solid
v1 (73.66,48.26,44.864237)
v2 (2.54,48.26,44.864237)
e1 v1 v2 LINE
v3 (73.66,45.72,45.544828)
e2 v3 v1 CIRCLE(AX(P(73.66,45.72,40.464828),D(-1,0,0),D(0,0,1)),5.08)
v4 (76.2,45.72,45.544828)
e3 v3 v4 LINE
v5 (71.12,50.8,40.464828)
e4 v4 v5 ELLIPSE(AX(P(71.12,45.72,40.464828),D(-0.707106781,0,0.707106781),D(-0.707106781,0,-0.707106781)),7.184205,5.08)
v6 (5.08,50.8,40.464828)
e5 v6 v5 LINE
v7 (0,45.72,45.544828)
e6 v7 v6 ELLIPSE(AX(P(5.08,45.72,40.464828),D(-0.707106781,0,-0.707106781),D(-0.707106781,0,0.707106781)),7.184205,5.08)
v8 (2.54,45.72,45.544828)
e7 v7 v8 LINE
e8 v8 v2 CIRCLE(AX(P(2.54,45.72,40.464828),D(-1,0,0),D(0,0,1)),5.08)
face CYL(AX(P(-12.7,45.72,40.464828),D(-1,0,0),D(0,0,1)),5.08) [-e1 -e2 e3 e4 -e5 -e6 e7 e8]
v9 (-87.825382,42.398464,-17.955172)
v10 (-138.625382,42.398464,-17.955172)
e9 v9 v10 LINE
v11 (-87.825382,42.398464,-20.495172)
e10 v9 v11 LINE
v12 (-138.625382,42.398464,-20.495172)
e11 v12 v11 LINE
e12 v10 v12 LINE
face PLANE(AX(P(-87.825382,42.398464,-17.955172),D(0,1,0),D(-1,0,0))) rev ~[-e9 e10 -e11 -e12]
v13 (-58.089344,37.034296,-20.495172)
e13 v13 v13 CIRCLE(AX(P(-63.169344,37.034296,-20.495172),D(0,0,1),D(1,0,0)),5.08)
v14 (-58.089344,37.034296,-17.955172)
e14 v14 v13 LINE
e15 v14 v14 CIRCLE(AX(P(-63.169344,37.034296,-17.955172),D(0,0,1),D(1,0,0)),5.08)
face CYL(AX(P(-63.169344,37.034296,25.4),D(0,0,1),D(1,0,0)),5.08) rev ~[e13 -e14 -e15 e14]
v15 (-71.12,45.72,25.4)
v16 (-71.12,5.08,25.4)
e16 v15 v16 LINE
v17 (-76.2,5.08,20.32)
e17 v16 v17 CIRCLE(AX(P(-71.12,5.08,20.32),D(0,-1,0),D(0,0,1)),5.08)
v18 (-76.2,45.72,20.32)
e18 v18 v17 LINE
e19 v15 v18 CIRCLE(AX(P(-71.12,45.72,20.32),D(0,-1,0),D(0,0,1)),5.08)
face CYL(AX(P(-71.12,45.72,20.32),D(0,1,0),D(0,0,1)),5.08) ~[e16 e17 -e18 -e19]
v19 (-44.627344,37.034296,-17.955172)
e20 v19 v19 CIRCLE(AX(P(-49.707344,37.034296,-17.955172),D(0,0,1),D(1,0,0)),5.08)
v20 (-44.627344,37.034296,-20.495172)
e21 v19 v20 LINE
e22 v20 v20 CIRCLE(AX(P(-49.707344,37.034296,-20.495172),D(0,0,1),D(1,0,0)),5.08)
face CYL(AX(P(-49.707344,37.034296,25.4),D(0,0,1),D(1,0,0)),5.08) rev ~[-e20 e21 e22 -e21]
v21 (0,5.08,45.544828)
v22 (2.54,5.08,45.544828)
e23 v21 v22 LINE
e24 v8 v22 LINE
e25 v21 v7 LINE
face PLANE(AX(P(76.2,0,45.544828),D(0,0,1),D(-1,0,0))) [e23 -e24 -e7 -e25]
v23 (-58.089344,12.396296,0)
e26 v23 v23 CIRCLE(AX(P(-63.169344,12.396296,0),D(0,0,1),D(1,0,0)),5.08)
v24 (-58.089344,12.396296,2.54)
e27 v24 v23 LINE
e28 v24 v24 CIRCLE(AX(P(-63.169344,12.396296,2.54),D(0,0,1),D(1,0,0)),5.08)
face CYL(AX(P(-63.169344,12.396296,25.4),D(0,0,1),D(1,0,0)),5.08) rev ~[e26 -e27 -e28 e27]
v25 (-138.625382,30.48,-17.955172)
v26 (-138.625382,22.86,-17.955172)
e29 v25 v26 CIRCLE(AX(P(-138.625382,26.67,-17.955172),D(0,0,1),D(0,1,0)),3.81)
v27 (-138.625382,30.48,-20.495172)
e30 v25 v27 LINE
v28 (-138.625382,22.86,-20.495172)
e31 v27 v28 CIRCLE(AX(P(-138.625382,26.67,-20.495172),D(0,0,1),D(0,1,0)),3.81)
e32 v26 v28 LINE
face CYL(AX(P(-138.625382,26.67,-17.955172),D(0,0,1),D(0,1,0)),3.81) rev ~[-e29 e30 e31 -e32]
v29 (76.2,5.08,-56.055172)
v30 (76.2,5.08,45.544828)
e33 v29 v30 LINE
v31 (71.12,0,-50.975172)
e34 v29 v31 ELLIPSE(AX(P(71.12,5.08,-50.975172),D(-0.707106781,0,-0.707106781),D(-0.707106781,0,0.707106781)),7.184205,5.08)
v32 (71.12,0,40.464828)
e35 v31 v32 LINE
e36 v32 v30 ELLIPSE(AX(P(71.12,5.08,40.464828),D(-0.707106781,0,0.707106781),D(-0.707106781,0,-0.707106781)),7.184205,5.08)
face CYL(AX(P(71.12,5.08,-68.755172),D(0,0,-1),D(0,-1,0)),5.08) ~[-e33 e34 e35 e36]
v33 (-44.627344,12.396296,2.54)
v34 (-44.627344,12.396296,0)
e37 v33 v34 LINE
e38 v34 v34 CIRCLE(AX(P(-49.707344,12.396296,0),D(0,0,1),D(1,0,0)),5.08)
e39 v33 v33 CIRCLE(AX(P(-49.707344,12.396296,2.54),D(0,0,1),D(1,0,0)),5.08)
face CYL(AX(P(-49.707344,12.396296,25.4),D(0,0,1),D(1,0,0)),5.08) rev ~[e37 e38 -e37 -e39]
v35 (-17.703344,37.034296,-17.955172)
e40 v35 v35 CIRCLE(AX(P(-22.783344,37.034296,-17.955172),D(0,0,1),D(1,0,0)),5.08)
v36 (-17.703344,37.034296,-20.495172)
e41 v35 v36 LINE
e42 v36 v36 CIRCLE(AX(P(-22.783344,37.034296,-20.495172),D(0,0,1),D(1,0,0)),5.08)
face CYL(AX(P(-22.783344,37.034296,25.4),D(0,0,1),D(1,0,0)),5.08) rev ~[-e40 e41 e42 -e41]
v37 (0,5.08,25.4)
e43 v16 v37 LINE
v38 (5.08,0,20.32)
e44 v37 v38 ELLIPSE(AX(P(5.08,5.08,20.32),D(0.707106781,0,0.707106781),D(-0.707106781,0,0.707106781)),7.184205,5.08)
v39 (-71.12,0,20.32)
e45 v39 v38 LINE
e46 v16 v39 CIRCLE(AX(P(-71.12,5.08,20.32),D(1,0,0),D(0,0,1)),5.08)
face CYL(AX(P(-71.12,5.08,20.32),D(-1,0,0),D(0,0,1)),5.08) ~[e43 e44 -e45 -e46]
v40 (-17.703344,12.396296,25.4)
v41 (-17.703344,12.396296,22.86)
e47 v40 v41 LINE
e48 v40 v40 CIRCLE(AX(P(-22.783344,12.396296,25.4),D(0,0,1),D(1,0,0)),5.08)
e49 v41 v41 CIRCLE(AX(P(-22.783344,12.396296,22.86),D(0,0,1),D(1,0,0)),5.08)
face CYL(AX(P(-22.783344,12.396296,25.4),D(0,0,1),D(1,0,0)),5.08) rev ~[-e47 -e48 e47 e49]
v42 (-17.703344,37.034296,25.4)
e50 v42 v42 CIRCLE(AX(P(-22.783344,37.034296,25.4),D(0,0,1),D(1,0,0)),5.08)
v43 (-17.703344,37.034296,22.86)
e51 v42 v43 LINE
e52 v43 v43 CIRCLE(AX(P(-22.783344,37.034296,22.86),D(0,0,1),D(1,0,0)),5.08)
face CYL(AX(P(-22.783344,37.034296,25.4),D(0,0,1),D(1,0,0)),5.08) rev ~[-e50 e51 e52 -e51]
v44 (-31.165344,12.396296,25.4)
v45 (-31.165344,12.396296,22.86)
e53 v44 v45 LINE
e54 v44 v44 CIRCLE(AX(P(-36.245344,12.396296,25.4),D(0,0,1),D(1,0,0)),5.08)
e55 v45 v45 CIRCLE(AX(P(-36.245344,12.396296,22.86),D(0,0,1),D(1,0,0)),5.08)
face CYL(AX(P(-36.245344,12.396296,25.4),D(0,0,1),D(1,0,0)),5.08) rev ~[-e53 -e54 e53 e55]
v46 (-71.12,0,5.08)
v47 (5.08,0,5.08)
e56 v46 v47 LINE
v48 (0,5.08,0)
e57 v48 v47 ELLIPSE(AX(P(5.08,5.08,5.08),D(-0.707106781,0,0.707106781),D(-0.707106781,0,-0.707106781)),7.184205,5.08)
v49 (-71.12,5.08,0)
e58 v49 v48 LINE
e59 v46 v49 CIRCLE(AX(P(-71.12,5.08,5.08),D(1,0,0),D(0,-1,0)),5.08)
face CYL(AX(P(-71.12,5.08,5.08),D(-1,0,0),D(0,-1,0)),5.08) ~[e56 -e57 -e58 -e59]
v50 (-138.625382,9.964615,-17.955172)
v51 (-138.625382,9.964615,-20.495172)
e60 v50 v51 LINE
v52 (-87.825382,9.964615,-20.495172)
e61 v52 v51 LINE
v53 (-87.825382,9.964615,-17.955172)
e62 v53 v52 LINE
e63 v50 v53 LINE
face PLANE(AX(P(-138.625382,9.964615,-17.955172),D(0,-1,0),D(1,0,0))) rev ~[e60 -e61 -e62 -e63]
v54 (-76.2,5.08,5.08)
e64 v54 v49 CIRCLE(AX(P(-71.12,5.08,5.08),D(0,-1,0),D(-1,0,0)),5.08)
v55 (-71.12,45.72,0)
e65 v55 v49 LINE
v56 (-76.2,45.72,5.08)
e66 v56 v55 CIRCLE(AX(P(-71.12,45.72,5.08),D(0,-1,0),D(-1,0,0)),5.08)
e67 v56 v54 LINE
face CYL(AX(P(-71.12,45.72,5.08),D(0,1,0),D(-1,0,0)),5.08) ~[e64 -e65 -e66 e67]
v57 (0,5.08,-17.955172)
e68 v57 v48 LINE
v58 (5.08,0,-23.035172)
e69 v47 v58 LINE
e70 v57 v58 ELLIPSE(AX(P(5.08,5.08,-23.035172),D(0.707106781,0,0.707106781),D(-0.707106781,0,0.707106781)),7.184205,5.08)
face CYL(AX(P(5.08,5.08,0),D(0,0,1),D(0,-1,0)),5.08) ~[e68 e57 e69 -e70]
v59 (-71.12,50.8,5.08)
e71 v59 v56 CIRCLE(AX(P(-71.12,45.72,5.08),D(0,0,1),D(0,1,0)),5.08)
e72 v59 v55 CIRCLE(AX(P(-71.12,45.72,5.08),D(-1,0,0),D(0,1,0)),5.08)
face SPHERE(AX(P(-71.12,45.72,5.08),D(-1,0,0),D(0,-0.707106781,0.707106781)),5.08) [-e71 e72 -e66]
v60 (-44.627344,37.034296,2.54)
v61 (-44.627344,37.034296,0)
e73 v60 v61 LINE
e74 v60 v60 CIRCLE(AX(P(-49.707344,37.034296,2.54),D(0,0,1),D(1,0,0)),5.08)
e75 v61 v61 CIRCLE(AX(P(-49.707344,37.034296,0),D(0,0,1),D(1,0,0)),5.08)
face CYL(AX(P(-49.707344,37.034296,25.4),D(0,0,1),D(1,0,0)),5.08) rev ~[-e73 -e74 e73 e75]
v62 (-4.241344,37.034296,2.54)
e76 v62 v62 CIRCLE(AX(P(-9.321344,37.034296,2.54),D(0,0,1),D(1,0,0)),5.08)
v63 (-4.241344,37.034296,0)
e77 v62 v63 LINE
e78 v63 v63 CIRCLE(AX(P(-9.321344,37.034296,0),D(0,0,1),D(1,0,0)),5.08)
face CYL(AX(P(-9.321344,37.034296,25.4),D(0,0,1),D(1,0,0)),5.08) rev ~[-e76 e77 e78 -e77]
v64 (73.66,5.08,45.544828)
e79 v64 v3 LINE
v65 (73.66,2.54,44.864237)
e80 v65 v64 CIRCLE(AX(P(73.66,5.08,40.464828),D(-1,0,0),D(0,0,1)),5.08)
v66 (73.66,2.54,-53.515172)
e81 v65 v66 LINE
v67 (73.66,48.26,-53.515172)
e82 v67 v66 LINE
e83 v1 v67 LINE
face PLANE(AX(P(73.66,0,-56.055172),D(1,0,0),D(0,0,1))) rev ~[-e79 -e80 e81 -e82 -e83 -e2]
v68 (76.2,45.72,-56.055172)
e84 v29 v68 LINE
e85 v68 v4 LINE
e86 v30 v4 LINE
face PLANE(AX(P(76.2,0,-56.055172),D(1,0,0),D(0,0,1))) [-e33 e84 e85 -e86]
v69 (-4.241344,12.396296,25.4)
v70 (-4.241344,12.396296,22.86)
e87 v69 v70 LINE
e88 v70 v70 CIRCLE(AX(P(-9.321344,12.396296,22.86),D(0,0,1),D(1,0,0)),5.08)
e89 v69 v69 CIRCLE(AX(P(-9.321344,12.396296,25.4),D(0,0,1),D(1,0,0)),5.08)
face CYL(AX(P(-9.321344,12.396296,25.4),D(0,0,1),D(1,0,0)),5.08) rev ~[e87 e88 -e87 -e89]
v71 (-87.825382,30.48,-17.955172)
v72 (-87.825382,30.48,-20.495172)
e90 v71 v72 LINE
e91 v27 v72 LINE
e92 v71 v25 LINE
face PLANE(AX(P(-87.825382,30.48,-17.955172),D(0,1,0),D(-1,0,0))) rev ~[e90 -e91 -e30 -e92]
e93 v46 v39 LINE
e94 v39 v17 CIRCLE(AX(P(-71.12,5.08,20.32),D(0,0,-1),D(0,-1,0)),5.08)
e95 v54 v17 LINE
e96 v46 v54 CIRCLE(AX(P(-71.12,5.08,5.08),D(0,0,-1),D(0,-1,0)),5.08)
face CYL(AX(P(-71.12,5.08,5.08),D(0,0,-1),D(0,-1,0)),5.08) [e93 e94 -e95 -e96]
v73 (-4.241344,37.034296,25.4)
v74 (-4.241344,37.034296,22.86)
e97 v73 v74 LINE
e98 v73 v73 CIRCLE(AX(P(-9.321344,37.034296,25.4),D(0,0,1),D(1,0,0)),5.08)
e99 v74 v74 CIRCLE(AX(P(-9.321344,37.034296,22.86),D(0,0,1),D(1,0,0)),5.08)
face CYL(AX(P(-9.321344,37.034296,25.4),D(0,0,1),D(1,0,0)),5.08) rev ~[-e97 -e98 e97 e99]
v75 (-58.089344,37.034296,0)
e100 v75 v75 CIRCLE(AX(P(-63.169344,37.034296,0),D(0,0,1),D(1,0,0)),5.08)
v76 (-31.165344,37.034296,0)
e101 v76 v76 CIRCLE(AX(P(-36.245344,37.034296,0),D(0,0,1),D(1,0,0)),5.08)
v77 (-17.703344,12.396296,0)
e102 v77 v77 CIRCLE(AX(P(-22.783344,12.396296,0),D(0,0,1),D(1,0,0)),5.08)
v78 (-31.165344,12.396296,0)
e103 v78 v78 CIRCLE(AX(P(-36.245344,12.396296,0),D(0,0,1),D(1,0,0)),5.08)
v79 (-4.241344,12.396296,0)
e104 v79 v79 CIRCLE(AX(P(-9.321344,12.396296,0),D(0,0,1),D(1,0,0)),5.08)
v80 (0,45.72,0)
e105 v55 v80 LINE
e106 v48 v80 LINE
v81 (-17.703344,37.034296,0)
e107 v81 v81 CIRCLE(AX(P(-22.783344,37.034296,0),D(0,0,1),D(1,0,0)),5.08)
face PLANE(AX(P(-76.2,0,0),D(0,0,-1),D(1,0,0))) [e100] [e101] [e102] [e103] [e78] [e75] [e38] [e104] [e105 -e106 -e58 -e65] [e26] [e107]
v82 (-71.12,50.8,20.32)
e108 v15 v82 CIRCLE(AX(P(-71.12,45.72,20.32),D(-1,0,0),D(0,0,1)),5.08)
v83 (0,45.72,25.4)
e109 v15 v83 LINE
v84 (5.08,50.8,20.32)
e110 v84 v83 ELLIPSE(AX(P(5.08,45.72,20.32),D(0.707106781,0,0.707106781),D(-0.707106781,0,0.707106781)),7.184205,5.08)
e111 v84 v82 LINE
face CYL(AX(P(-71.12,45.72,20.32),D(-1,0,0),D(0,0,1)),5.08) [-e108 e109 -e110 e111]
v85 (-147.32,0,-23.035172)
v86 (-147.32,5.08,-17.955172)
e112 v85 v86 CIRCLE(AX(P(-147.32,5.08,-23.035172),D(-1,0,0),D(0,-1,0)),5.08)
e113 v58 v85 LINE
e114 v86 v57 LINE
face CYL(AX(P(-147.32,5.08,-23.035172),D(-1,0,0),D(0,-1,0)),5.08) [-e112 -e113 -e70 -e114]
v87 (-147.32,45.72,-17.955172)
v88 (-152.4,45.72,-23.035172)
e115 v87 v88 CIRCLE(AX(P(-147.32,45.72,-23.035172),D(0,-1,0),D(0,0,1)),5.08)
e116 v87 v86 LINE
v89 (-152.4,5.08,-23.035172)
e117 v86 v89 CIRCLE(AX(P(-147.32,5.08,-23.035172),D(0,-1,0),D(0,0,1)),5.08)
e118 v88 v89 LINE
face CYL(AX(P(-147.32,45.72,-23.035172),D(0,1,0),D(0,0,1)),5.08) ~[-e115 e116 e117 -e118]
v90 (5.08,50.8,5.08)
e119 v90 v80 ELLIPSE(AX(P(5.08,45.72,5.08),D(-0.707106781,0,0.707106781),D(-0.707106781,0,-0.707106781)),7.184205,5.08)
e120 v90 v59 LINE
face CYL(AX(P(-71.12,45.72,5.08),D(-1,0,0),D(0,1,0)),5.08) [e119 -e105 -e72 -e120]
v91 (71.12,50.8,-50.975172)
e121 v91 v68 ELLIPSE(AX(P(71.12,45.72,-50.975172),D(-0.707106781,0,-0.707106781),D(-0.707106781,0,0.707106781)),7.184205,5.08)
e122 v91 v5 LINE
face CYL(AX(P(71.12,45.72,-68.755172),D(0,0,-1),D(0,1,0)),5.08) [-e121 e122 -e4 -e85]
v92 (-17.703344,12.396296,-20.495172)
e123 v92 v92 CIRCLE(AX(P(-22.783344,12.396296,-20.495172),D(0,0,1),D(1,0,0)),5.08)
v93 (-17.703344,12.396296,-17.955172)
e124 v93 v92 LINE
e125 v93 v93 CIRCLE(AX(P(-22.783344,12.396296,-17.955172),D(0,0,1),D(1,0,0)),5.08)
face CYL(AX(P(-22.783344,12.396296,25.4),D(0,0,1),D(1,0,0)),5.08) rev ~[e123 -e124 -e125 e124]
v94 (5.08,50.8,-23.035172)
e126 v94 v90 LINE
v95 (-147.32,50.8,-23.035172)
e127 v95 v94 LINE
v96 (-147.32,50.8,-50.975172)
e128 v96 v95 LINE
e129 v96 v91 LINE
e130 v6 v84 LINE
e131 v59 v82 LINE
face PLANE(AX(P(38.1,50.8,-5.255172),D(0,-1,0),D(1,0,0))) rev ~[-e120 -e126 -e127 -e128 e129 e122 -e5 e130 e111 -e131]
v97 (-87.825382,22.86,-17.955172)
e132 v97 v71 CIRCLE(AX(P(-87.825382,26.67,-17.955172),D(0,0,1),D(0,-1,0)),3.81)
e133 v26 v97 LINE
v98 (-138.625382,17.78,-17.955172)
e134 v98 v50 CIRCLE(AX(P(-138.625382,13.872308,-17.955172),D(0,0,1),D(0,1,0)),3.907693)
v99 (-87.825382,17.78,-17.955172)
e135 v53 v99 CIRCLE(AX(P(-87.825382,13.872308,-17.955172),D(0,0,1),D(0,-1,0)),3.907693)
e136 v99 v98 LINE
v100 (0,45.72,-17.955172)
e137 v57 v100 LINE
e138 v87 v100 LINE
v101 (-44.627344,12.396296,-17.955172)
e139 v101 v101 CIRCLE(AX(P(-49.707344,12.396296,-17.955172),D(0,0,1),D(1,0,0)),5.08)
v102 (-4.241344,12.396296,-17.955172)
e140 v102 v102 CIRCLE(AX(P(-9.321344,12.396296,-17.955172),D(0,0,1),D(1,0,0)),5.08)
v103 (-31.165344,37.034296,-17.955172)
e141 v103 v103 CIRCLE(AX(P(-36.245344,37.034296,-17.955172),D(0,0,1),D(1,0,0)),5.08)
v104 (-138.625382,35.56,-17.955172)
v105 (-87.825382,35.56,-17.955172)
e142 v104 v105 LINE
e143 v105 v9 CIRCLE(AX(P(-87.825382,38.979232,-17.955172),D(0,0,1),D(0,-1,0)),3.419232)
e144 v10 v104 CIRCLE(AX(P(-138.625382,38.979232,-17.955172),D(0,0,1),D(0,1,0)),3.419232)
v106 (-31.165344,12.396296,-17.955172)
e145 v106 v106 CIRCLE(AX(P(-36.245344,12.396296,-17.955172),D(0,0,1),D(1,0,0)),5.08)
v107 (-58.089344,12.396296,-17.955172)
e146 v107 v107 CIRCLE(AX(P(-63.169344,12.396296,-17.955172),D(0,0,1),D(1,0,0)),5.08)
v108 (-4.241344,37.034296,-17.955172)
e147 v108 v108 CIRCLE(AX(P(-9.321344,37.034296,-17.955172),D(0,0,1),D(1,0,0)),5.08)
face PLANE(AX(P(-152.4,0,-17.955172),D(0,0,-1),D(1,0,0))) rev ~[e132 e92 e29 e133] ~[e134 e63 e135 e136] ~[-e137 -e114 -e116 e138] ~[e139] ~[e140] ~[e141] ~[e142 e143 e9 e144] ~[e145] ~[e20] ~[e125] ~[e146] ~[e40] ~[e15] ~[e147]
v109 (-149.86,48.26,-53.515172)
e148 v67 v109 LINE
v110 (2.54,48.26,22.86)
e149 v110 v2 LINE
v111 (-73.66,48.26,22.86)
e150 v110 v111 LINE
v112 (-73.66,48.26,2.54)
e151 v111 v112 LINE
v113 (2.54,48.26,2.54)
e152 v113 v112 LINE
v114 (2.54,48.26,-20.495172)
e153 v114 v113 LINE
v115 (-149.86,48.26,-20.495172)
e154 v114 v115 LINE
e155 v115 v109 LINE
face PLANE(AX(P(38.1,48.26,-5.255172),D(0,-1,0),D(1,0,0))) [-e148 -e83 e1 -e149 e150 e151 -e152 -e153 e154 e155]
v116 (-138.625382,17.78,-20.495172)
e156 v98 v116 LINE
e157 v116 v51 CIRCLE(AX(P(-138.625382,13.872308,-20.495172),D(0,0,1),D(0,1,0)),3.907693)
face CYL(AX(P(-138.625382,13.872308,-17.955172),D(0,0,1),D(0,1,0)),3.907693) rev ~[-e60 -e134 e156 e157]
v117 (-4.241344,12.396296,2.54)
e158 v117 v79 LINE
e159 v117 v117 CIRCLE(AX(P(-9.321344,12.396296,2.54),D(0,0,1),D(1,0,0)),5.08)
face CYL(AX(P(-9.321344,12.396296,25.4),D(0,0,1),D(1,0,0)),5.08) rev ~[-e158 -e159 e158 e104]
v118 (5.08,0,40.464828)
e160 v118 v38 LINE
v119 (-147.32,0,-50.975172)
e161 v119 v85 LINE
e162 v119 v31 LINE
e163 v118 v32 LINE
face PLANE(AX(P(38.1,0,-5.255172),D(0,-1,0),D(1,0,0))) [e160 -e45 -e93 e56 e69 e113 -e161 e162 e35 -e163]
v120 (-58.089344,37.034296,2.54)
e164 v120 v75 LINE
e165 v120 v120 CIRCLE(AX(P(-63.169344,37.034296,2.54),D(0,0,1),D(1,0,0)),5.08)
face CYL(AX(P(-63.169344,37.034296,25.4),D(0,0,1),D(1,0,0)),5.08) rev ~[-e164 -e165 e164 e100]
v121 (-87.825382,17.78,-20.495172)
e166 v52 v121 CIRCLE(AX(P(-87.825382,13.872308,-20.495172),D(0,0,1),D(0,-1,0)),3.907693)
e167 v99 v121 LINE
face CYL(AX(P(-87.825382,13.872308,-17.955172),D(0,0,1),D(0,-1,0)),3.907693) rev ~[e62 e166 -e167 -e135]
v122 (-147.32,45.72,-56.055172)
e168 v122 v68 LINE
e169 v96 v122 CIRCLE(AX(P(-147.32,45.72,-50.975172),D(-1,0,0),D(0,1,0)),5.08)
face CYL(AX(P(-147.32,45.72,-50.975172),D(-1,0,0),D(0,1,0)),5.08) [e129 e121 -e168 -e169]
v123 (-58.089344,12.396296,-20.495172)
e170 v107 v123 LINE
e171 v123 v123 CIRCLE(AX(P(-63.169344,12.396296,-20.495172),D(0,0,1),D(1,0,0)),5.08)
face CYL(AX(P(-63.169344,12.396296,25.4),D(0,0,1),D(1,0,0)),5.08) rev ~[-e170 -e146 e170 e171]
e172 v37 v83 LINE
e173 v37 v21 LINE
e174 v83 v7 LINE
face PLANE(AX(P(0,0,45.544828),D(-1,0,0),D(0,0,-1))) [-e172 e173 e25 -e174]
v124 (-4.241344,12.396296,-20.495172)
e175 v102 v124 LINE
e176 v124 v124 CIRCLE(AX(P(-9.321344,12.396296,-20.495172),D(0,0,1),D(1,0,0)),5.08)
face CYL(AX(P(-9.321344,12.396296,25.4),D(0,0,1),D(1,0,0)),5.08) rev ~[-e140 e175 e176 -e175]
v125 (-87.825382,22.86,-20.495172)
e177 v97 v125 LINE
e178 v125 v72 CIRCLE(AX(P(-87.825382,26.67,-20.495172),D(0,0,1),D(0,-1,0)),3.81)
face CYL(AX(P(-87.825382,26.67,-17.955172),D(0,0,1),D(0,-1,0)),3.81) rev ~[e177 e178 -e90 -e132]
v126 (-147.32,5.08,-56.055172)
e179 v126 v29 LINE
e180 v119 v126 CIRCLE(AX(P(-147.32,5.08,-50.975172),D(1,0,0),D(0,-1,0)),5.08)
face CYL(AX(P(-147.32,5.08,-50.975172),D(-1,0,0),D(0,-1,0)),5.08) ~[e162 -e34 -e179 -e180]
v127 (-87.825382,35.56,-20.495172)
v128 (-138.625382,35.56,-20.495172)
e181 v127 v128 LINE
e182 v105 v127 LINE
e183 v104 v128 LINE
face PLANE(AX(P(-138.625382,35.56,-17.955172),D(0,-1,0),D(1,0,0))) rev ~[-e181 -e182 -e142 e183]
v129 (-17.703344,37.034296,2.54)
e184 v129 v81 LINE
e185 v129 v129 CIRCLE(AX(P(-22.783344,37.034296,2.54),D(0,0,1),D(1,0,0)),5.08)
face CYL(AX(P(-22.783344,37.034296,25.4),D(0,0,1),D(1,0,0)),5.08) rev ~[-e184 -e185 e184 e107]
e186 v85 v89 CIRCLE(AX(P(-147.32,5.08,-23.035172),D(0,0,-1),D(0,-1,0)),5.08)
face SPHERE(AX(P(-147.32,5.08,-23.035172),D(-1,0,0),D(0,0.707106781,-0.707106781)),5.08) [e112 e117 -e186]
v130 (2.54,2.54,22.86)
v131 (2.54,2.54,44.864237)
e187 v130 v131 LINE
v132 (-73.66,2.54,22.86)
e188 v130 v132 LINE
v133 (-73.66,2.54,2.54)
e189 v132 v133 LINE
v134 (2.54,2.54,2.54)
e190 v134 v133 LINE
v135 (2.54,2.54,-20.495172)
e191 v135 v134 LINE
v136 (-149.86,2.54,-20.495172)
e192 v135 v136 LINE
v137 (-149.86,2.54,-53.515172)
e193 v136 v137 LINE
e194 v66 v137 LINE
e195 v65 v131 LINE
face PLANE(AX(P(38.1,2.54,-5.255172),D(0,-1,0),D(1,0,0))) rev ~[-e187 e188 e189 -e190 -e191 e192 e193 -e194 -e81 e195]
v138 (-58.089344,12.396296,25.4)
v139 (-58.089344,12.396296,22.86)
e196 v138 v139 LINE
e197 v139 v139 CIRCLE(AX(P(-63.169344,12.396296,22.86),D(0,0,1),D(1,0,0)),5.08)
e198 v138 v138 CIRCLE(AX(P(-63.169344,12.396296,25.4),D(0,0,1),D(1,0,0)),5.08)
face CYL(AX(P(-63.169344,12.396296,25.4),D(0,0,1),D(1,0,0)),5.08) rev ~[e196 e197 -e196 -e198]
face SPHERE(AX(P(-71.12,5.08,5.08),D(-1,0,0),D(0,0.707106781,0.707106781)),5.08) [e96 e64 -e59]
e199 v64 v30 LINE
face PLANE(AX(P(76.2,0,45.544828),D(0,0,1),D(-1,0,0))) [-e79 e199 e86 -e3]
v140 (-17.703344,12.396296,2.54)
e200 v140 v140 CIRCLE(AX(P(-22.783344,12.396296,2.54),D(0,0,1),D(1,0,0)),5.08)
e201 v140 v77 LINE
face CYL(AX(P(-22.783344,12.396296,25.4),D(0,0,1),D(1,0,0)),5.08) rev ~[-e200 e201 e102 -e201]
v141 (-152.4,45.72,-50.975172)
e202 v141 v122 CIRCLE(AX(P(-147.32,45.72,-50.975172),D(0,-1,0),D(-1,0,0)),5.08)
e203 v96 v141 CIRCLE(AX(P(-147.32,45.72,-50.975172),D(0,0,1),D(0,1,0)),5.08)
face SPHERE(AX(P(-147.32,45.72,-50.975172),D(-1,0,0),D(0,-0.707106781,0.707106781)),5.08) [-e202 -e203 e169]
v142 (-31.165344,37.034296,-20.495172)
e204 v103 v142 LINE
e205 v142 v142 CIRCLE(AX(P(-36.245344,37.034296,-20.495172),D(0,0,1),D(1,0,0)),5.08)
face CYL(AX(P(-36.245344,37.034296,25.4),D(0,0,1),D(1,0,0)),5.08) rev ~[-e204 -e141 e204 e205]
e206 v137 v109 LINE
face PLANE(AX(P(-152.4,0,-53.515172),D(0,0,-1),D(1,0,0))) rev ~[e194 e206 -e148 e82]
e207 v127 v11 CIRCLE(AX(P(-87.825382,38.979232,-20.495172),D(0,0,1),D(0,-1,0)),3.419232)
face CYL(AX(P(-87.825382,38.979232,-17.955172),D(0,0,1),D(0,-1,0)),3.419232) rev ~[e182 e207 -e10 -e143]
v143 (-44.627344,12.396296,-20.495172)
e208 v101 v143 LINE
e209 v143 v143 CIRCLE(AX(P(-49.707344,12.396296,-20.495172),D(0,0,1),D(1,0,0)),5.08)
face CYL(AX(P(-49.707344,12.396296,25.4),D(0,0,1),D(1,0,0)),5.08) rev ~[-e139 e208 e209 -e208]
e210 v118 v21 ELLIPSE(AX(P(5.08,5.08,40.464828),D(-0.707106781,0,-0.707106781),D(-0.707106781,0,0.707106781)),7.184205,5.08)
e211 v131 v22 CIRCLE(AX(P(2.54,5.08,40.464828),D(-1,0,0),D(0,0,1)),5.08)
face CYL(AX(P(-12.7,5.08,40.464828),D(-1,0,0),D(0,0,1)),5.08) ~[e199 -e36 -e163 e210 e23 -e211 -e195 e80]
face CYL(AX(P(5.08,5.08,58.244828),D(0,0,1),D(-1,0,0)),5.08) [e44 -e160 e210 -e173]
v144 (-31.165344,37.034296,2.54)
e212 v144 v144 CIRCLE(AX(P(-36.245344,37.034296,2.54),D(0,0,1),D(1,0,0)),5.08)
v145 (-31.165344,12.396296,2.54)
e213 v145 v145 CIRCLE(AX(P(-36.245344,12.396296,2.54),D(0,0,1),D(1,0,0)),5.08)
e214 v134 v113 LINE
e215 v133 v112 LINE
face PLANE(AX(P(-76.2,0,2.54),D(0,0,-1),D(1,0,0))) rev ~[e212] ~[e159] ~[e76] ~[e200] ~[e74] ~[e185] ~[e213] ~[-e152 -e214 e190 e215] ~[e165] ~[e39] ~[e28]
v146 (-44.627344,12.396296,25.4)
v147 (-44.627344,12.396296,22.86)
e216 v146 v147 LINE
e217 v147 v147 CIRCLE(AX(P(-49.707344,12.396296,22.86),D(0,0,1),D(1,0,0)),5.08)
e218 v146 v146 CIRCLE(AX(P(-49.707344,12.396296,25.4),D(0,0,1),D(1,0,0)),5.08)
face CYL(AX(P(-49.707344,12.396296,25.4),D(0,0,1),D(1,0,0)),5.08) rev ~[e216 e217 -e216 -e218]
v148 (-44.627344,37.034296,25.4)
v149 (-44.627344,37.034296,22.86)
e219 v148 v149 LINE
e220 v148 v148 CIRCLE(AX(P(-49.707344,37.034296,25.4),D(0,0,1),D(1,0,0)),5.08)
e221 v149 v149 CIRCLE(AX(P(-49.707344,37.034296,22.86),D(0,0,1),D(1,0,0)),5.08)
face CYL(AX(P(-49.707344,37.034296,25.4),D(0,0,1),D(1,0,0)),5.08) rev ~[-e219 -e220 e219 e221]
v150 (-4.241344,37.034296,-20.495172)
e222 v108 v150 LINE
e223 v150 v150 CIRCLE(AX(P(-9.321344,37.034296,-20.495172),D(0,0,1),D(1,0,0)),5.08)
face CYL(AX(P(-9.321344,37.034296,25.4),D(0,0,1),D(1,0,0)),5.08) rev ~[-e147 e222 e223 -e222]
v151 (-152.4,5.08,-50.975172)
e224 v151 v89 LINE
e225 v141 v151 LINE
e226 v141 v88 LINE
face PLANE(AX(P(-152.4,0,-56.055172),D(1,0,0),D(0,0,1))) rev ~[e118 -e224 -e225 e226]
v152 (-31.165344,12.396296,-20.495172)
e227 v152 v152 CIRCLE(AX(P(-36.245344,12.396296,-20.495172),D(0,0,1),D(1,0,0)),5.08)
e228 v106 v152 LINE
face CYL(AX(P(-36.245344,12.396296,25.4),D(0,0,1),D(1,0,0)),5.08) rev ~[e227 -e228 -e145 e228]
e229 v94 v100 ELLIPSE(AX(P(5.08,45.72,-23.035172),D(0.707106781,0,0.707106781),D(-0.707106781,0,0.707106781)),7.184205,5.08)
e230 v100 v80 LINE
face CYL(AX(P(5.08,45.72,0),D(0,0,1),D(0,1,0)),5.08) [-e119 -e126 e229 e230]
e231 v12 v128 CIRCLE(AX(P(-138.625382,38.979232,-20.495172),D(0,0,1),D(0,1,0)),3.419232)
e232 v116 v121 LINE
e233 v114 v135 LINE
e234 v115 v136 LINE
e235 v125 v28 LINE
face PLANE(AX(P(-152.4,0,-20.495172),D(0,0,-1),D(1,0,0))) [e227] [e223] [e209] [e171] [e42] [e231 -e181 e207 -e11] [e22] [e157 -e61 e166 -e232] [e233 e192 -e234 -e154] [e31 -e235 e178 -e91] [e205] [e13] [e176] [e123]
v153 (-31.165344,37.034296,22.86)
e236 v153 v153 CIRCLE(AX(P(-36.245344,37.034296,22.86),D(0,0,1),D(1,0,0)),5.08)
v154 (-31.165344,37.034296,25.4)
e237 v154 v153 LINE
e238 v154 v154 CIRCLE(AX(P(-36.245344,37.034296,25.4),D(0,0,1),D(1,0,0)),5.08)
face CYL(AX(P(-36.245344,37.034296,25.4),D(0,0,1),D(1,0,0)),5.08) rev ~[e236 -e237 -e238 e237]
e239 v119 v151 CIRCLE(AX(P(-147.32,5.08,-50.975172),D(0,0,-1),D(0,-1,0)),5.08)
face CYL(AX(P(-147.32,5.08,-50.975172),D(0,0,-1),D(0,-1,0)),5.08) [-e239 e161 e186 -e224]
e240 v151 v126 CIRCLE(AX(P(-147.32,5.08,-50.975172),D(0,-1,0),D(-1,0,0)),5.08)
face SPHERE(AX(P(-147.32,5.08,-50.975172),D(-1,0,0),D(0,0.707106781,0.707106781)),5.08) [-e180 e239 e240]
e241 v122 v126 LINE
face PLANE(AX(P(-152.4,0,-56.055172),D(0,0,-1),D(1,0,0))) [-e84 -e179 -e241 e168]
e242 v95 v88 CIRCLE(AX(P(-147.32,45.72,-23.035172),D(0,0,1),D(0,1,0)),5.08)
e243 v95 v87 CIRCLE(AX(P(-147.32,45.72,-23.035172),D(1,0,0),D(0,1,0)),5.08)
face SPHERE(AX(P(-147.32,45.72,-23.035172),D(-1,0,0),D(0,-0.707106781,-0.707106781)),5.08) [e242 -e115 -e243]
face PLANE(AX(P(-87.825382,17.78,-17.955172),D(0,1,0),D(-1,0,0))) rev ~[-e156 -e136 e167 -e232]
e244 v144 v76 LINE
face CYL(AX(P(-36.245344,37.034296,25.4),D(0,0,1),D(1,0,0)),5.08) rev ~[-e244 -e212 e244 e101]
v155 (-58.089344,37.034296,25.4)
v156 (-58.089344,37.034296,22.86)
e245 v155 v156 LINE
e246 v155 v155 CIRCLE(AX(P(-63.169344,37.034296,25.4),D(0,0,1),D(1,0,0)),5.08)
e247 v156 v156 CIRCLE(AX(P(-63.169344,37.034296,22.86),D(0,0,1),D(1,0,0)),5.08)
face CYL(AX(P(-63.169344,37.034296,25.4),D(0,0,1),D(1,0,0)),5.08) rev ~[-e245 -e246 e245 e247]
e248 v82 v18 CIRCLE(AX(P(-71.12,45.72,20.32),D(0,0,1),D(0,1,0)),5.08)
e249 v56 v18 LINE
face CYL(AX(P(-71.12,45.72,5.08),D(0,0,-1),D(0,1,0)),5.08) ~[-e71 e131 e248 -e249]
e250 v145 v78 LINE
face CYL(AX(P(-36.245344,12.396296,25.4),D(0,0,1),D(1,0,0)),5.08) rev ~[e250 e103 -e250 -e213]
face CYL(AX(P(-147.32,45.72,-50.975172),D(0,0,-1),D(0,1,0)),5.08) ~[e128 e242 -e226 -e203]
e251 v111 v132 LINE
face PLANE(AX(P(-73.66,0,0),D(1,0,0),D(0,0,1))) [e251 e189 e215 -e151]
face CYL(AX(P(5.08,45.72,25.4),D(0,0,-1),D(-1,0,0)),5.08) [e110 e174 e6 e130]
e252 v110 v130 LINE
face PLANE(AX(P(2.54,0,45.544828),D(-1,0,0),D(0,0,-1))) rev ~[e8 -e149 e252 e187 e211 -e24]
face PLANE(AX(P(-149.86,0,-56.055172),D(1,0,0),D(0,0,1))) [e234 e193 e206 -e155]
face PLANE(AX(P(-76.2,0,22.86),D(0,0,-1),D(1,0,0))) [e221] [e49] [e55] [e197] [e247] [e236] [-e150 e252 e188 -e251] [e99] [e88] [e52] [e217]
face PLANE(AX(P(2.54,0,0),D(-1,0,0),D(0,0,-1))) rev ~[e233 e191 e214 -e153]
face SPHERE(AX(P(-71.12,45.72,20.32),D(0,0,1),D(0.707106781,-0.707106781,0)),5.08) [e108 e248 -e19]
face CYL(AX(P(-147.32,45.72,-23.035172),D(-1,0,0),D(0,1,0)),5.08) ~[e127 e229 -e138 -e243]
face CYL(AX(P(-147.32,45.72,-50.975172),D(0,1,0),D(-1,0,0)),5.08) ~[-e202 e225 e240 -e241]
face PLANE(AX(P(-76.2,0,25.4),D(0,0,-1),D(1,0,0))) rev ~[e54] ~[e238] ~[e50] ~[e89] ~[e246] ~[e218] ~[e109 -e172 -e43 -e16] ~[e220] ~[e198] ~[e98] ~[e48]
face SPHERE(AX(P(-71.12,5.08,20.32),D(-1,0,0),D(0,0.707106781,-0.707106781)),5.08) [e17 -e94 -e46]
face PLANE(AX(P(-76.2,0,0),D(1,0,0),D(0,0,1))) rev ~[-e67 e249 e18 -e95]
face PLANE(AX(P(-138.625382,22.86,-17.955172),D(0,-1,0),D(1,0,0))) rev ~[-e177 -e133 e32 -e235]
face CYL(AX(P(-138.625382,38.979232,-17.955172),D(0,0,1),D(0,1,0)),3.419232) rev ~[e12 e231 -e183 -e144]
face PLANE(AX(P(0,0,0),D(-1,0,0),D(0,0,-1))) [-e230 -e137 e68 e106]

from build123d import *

# Parameters (mm, degrees)
F0_W          = 76.2
F0_H          = 25.4
F0_W_2        = 152.4
F0_H_2        = 38.1
F1_DEPTH      = 50.8
F2_T          = -2.54
F3_R          = 5.08
F4_DEPTH      = 76.2
F5_T1_DEPTH   = 101.6
F5_T3_DEPTH   = 32.8448284238
F5_T5_DEPTH   = 71.12
F5_T7_DEPTH   = 15.24
F5_T9_DEPTH   = 17.9551715762
F5_T11_DEPTH  = 147.32
F5_T13_DEPTH  = 27.94
F5_T15_DEPTH  = 236.22
F5_T17_DEPTH  = 127
F5_T19_DEPTH  = 40.64
F5_S23_W      = 5.08
F5_S23_H      = 5.08
F5_T24_DEPTH  = 5.08
F5_S29_W      = 5.08
F5_S29_H      = 5.08
F5_T30_DEPTH  = 5.08
F5_S35_W      = 5.08
F5_S35_H      = 5.08
F5_T36_DEPTH  = 5.08
F5_S41_W      = 5.08
F5_S41_H      = 5.08
F5_T42_DEPTH  = 5.08
F5_S47_W      = 5.08
F5_S47_H      = 5.08
F5_T48_DEPTH  = 5.08
F5_S53_W      = 5.08
F5_S53_H      = 5.08
F5_T54_DEPTH  = 5.08
F5_S59_W      = 5.08
F5_S59_H      = 5.08
F5_T60_DEPTH  = 5.08
F5_S65_W      = 5.08
F5_S65_H      = 5.08
F5_T66_DEPTH  = 5.08
F5_T73_DEPTH  = 45.5448284238
F5_T77_DEPTH  = 83.82
F5_T84_DEPTH  = 83.82
F5_T88_DEPTH  = 30.6551715762
F5_T95_DEPTH  = 30.6551715762
F5_T99_DEPTH  = 160.02
F5_T106_DEPTH = 45.5448284238
F5_T110_DEPTH = 83.82
F5_T117_DEPTH = 83.82
F5_T121_DEPTH = 30.6551715762
F5_T128_DEPTH = 30.6551715762
F5_T132_DEPTH = 160.02
F7_DEPTH      = 25.4


# Not quite as in the source:
# - a fillet or chamfer that OpenCascade refuses, or shapes differently, is made with other operations: its cross-section is extruded or revolved along the edge and cut away or added


with BuildPart() as f1:
    # F0 (on Front) → F1 (new body)
    with BuildSketch(Plane.XZ):
        Polygon((76.2, 45.5448284238), (0, 45.5448284238), (0, 25.4), (0, 0), (0, -17.9551715762), (0, -56.0551715762), (76.2, -56.0551715762), align=None)
        with Locations((-38.1, 12.7)):
            Rectangle(F0_W, F0_H)
        with Locations((-76.2, -37.0051715762)):
            Rectangle(F0_W_2, F0_H_2)
    extrude(amount=-F1_DEPTH)

    # F2
    f2_openings = [f1.faces().sort_by_distance(p)[0] for p in [
        (38.1, 25.4, 45.544828),
    ]]
    offset(amount=F2_T, openings=f2_openings, kind=Kind.INTERSECTION)

    # F3 (on face) → F4 (cut)
    with BuildSketch(Plane.XY.offset(25.4)):
        with Locations((-9.3213441366, 12.3962962994)):
            Circle(F3_R)
        with Locations((-9.3213441366, 37.0342962994)):
            Circle(F3_R)
        with Locations((-22.7833441366, 12.3962962994)):
            Circle(F3_R)
        with Locations((-22.7833441366, 37.0342962994)):
            Circle(F3_R)
        with Locations((-36.2453441366, 12.3962962994)):
            Circle(F3_R)
        with Locations((-36.2453441366, 37.0342962994)):
            Circle(F3_R)
        with Locations((-49.7073441366, 12.3962962994)):
            Circle(F3_R)
        with Locations((-49.7073441366, 37.0342962994)):
            Circle(F3_R)
        with Locations((-63.1693441366, 12.3962962994)):
            Circle(F3_R)
        with Locations((-63.1693441366, 37.0342962994)):
            Circle(F3_R)
    extrude(amount=-F4_DEPTH, mode=Mode.SUBTRACT)

    # F5: fillet of radius 5.08 on 24 edges, made by hand

    # F5_s2 → F5_t1 (cut)
    with BuildSketch(Plane.YZ.offset(-12.7)):
        with BuildLine():
            ThreePointArc((5.08, 45.5448284238), (1.4878975516, 44.0569308722), (0, 40.4648284238))
            Line((0, 40.4648284238), (0, 45.5448284238))
            Line((0, 45.5448284238), (5.08, 45.5448284238))
        make_face()
        with BuildLine():
            ThreePointArc((45.72, 45.5448284238), (49.3121024484, 44.0569308722), (50.8, 40.4648284238))
            Line((50.8, 40.4648284238), (50.8, 45.5448284238))
            Line((50.8, 45.5448284238), (45.72, 45.5448284238))
        make_face()
    extrude(amount=F5_T1_DEPTH, mode=Mode.SUBTRACT)

    # F5_s4 → F5_t3 (cut)
    with BuildSketch(Plane.XY.offset(25.4)):
        with BuildLine():
            ThreePointArc((0, 5.08), (1.4878975516, 1.4878975516), (5.08, 0))
            Line((5.08, 0), (0, 0))
            Line((0, 0), (0, 5.08))
        make_face()
        with BuildLine():
            ThreePointArc((0, 45.72), (1.4878975516, 49.3121024484), (5.08, 50.8))
            Line((5.08, 50.8), (0, 50.8))
            Line((0, 50.8), (0, 45.72))
        make_face()
    extrude(amount=F5_T3_DEPTH, mode=Mode.SUBTRACT)

    # F5_s6 → F5_t5 (cut)
    with BuildSketch(Plane.YZ.offset(-71.12)):
        with BuildLine():
            ThreePointArc((5.08, 25.4), (1.4878975516, 23.9121024484), (0, 20.32))
            Line((0, 20.32), (0, 25.4))
            Line((0, 25.4), (5.08, 25.4))
        make_face()
        with BuildLine():
            ThreePointArc((0, 5.08), (1.4878975516, 1.4878975516), (5.08, 0))
            Line((5.08, 0), (0, 0))
            Line((0, 0), (0, 5.08))
        make_face()
        with BuildLine():
            ThreePointArc((45.72, 25.4), (49.3121024484, 23.9121024484), (50.8, 20.32))
            Line((50.8, 20.32), (50.8, 25.4))
            Line((50.8, 25.4), (45.72, 25.4))
        make_face()
        with BuildLine():
            ThreePointArc((50.8, 5.08), (49.3121024484, 1.4878975516), (45.72, 0))
            Line((45.72, 0), (50.8, 0))
            Line((50.8, 0), (50.8, 5.08))
        make_face()
    extrude(amount=F5_T5_DEPTH, mode=Mode.SUBTRACT)

    # F5_s8 → F5_t7 (cut)
    with BuildSketch(Plane.XY.offset(5.08)):
        with BuildLine():
            ThreePointArc((-71.12, 0), (-74.7121024484, 1.4878975516), (-76.2, 5.08))
            Line((-76.2, 5.08), (-76.2, 0))
            Line((-76.2, 0), (-71.12, 0))
        make_face()
        with BuildLine():
            ThreePointArc((-71.12, 50.8), (-74.7121024484, 49.3121024484), (-76.2, 45.72))
            Line((-76.2, 45.72), (-76.2, 50.8))
            Line((-76.2, 50.8), (-71.12, 50.8))
        make_face()
    extrude(amount=F5_T7_DEPTH, mode=Mode.SUBTRACT)

    # F5_s10 → F5_t9 (cut)
    with BuildSketch(Plane.XY.offset(-17.9551715762)):
        with BuildLine():
            ThreePointArc((5.08, 0), (1.4878975516, 1.4878975516), (0, 5.08))
            Line((0, 5.08), (0, 0))
            Line((0, 0), (5.08, 0))
        make_face()
        with BuildLine():
            ThreePointArc((5.08, 50.8), (1.4878975516, 49.3121024484), (0, 45.72))
            Line((0, 45.72), (0, 50.8))
            Line((0, 50.8), (5.08, 50.8))
        make_face()
    extrude(amount=F5_T9_DEPTH, mode=Mode.SUBTRACT)

    # F5_s12 → F5_t11 (cut)
    with BuildSketch(Plane.YZ.offset(-147.32)):
        with BuildLine():
            ThreePointArc((0, -23.0351715762), (1.4878975516, -19.4430691278), (5.08, -17.9551715762))
            Line((5.08, -17.9551715762), (0, -17.9551715762))
            Line((0, -17.9551715762), (0, -23.0351715762))
        make_face()
        with BuildLine():
            ThreePointArc((50.8, -23.0351715762), (49.3121024484, -19.4430691278), (45.72, -17.9551715762))
            Line((45.72, -17.9551715762), (50.8, -17.9551715762))
            Line((50.8, -17.9551715762), (50.8, -23.0351715762))
        make_face()
    extrude(amount=F5_T11_DEPTH, mode=Mode.SUBTRACT)

    # F5_s14 → F5_t13 (cut)
    with BuildSketch(Plane.XY.offset(-50.9751715762)):
        with BuildLine():
            ThreePointArc((-147.32, 0), (-150.9121024484, 1.4878975516), (-152.4, 5.08))
            Line((-152.4, 5.08), (-152.4, 0))
            Line((-152.4, 0), (-147.32, 0))
        make_face()
        with BuildLine():
            ThreePointArc((-147.32, 50.8), (-150.9121024484, 49.3121024484), (-152.4, 45.72))
            Line((-152.4, 45.72), (-152.4, 50.8))
            Line((-152.4, 50.8), (-147.32, 50.8))
        make_face()
    extrude(amount=F5_T13_DEPTH, mode=Mode.SUBTRACT)

    # F5_s16 → F5_t15 (cut)
    with BuildSketch(Plane.YZ.offset(-147.32)):
        with BuildLine():
            ThreePointArc((0, -50.9751715762), (1.4878975516, -54.5672740246), (5.08, -56.0551715762))
            Line((5.08, -56.0551715762), (0, -56.0551715762))
            Line((0, -56.0551715762), (0, -50.9751715762))
        make_face()
        with BuildLine():
            ThreePointArc((50.8, -50.9751715762), (49.3121024484, -54.5672740246), (45.72, -56.0551715762))
            Line((45.72, -56.0551715762), (50.8, -56.0551715762))
            Line((50.8, -56.0551715762), (50.8, -50.9751715762))
        make_face()
    extrude(amount=F5_T15_DEPTH, mode=Mode.SUBTRACT)

    # F5_s18 → F5_t17 (cut)
    with BuildSketch(Plane.XY.offset(-68.7551715762)):
        with BuildLine():
            ThreePointArc((71.12, 0), (74.7121024484, 1.4878975516), (76.2, 5.08))
            Line((76.2, 5.08), (76.2, 0))
            Line((76.2, 0), (71.12, 0))
        make_face()
        with BuildLine():
            ThreePointArc((71.12, 50.8), (74.7121024484, 49.3121024484), (76.2, 45.72))
            Line((76.2, 45.72), (76.2, 50.8))
            Line((76.2, 50.8), (71.12, 50.8))
        make_face()
    extrude(amount=F5_T17_DEPTH, mode=Mode.SUBTRACT)

    # F5_s20 → F5_t19 (cut)
    with BuildSketch(Plane.XZ.offset(-45.72)):
        with BuildLine():
            ThreePointArc((-147.32, -17.9551715762), (-150.9121024484, -19.4430691278), (-152.4, -23.0351715762))
            Line((-152.4, -23.0351715762), (-152.4, -17.9551715762))
            Line((-152.4, -17.9551715762), (-147.32, -17.9551715762))
        make_face()
        with BuildLine():
            ThreePointArc((-152.4, -50.9751715762), (-150.9121024484, -54.5672740246), (-147.32, -56.0551715762))
            Line((-147.32, -56.0551715762), (-152.4, -56.0551715762))
            Line((-152.4, -56.0551715762), (-152.4, -50.9751715762))
        make_face()
        with BuildLine():
            ThreePointArc((-71.12, 25.4), (-74.7121024484, 23.9121024484), (-76.2, 20.32))
            Line((-76.2, 20.32), (-76.2, 25.4))
            Line((-76.2, 25.4), (-71.12, 25.4))
        make_face()
        with BuildLine():
            ThreePointArc((-76.2, 5.08), (-74.7121024484, 1.4878975516), (-71.12, 0))
            Line((-71.12, 0), (-76.2, 0))
            Line((-76.2, 0), (-76.2, 5.08))
        make_face()
    extrude(amount=F5_T19_DEPTH, mode=Mode.SUBTRACT)


with BuildPart() as f5_tool22:
    # F5_s23 → F5_t24 (new body)
    with BuildSketch(Plane.YZ.offset(-71.12)):
        with Locations((2.54, 22.86)):
            Rectangle(F5_S23_W, F5_S23_H)
    extrude(amount=-F5_T24_DEPTH)

    # F5_s25 → F5_t26 (revolve, cut)
    with BuildSketch(Plane(origin=(-71.12, 5.08, 20.32), x_dir=(0, 0.7071067812, -0.7071067812), z_dir=(0, 0.7071067812, 0.7071067812))):
        with BuildLine():
            ThreePointArc((0, -5.08), (5.08, 0), (0, 5.08))
            Line((0, 5.08), (0, -5.08))
        make_face()
    revolve(axis=Axis((-71.12, 5.08, 20.32), (-1, 0, 0)), mode=Mode.SUBTRACT)


with BuildPart() as f1_1:
    add(f1.part)

    # F5_t21: cut F5_tool22
    add(f5_tool22.part, mode=Mode.SUBTRACT)


with BuildPart() as f5_tool28:
    # F5_s29 → F5_t30 (new body)
    with BuildSketch(Plane.YZ.offset(-71.12)):
        with Locations((2.54, 2.54)):
            Rectangle(F5_S29_W, F5_S29_H)
    extrude(amount=-F5_T30_DEPTH)

    # F5_s31 → F5_t32 (revolve, cut)
    with BuildSketch(Plane(origin=(-71.12, 5.08, 5.08), x_dir=(0, 0.7071067812, 0.7071067812), z_dir=(0, -0.7071067812, 0.7071067812))):
        with BuildLine():
            ThreePointArc((0, -5.08), (5.08, 0), (0, 5.08))
            Line((0, 5.08), (0, -5.08))
        make_face()
    revolve(axis=Axis((-71.12, 5.08, 5.08), (-1, 0, 0)), mode=Mode.SUBTRACT)


with BuildPart() as f1_2:
    add(f1_1.part)

    # F5_t27: cut F5_tool28
    add(f5_tool28.part, mode=Mode.SUBTRACT)


with BuildPart() as f5_tool34:
    # F5_s35 → F5_t36 (new body)
    with BuildSketch(Plane.YZ.offset(-147.32)):
        with Locations((2.54, -20.4951715762)):
            Rectangle(F5_S35_W, F5_S35_H)
    extrude(amount=-F5_T36_DEPTH)

    # F5_s37 → F5_t38 (revolve, cut)
    with BuildSketch(Plane(origin=(-147.32, 5.08, -23.0351715762), x_dir=(0, 0.7071067812, -0.7071067812), z_dir=(0, 0.7071067812, 0.7071067812))):
        with BuildLine():
            ThreePointArc((0, -5.08), (5.08, 0), (0, 5.08))
            Line((0, 5.08), (0, -5.08))
        make_face()
    revolve(axis=Axis((-147.32, 5.08, -23.0351715762), (-1, 0, 0)), mode=Mode.SUBTRACT)


with BuildPart() as f1_3:
    add(f1_2.part)

    # F5_t33: cut F5_tool34
    add(f5_tool34.part, mode=Mode.SUBTRACT)


with BuildPart() as f5_tool40:
    # F5_s41 → F5_t42 (new body)
    with BuildSketch(Plane.YZ.offset(-147.32)):
        with Locations((2.54, -53.5151715762)):
            Rectangle(F5_S41_W, F5_S41_H)
    extrude(amount=-F5_T42_DEPTH)

    # F5_s43 → F5_t44 (revolve, cut)
    with BuildSketch(Plane(origin=(-147.32, 5.08, -50.9751715762), x_dir=(0, 0.7071067812, 0.7071067812), z_dir=(0, -0.7071067812, 0.7071067812))):
        with BuildLine():
            ThreePointArc((0, -5.08), (5.08, 0), (0, 5.08))
            Line((0, 5.08), (0, -5.08))
        make_face()
    revolve(axis=Axis((-147.32, 5.08, -50.9751715762), (-1, 0, 0)), mode=Mode.SUBTRACT)


with BuildPart() as f1_4:
    add(f1_3.part)

    # F5_t39: cut F5_tool40
    add(f5_tool40.part, mode=Mode.SUBTRACT)


with BuildPart() as f5_tool46:
    # F5_s47 → F5_t48 (new body)
    with BuildSketch(Plane.XY.offset(20.32)):
        with Locations((-73.66, 48.26)):
            Rectangle(F5_S47_W, F5_S47_H)
    extrude(amount=F5_T48_DEPTH)

    # F5_s49 → F5_t50 (revolve, cut)
    with BuildSketch(Plane(origin=(-71.12, 45.72, 20.32), x_dir=(0.7071067812, -0.7071067812, 0), z_dir=(-0.7071067812, -0.7071067812, 0))):
        with BuildLine():
            ThreePointArc((0, -5.08), (5.08, 0), (0, 5.08))
            Line((0, 5.08), (0, -5.08))
        make_face()
    revolve(axis=Axis((-71.12, 45.72, 20.32), (0, 0, 1)), mode=Mode.SUBTRACT)


with BuildPart() as f1_5:
    add(f1_4.part)

    # F5_t45: cut F5_tool46
    add(f5_tool46.part, mode=Mode.SUBTRACT)


with BuildPart() as f5_tool52:
    # F5_s53 → F5_t54 (new body)
    with BuildSketch(Plane.YZ.offset(-71.12)):
        with Locations((48.26, 2.54)):
            Rectangle(F5_S53_W, F5_S53_H)
    extrude(amount=-F5_T54_DEPTH)

    # F5_s55 → F5_t56 (revolve, cut)
    with BuildSketch(Plane(origin=(-71.12, 45.72, 5.08), x_dir=(0, -0.7071067812, 0.7071067812), z_dir=(0, -0.7071067812, -0.7071067812))):
        with BuildLine():
            ThreePointArc((0, -5.08), (5.08, 0), (0, 5.08))
            Line((0, 5.08), (0, -5.08))
        make_face()
    revolve(axis=Axis((-71.12, 45.72, 5.08), (-1, 0, 0)), mode=Mode.SUBTRACT)


with BuildPart() as f1_6:
    add(f1_5.part)

    # F5_t51: cut F5_tool52
    add(f5_tool52.part, mode=Mode.SUBTRACT)


with BuildPart() as f5_tool58:
    # F5_s59 → F5_t60 (new body)
    with BuildSketch(Plane.YZ.offset(-147.32)):
        with Locations((48.26, -20.4951715762)):
            Rectangle(F5_S59_W, F5_S59_H)
    extrude(amount=-F5_T60_DEPTH)

    # F5_s61 → F5_t62 (revolve, cut)
    with BuildSketch(Plane(origin=(-147.32, 45.72, -23.0351715762), x_dir=(0, -0.7071067812, -0.7071067812), z_dir=(0, 0.7071067812, -0.7071067812))):
        with BuildLine():
            ThreePointArc((0, -5.08), (5.08, 0), (0, 5.08))
            Line((0, 5.08), (0, -5.08))
        make_face()
    revolve(axis=Axis((-147.32, 45.72, -23.0351715762), (-1, 0, 0)), mode=Mode.SUBTRACT)


with BuildPart() as f1_7:
    add(f1_6.part)

    # F5_t57: cut F5_tool58
    add(f5_tool58.part, mode=Mode.SUBTRACT)


with BuildPart() as f5_tool64:
    # F5_s65 → F5_t66 (new body)
    with BuildSketch(Plane.YZ.offset(-147.32)):
        with Locations((48.26, -53.5151715762)):
            Rectangle(F5_S65_W, F5_S65_H)
    extrude(amount=-F5_T66_DEPTH)

    # F5_s67 → F5_t68 (revolve, cut)
    with BuildSketch(Plane(origin=(-147.32, 45.72, -50.9751715762), x_dir=(0, -0.7071067812, 0.7071067812), z_dir=(0, -0.7071067812, -0.7071067812))):
        with BuildLine():
            ThreePointArc((0, -5.08), (5.08, 0), (0, 5.08))
            Line((0, 5.08), (0, -5.08))
        make_face()
    revolve(axis=Axis((-147.32, 45.72, -50.9751715762), (-1, 0, 0)), mode=Mode.SUBTRACT)


with BuildPart() as f1_8:
    add(f1_7.part)

    # F5_t63: cut F5_tool64
    add(f5_tool64.part, mode=Mode.SUBTRACT)


with BuildPart() as f5_tool71:
    # F5_s72 → F5_t73 (new body)
    with BuildSketch(Plane.XY.offset(58.2448284238)):
        with BuildLine():
            ThreePointArc((0, 5.08), (1.4878975516, 1.4878975516), (5.08, 0))
            Line((5.08, 0), (0, 0))
            Line((0, 0), (0, 5.08))
        make_face()
    extrude(amount=-F5_T73_DEPTH)

    split(bisect_by=Plane.XY.offset(25.4), keep=Keep.BOTTOM)


with BuildPart() as f5_tool75:
    # F5_s76 → F5_t77 (new body)
    with BuildSketch(Plane.YZ.offset(12.7)):
        with BuildLine():
            ThreePointArc((5.08, 25.4), (1.4878975516, 23.9121024484), (0, 20.32))
            Line((0, 20.32), (0, 25.4))
            Line((0, 25.4), (5.08, 25.4))
        make_face()
    extrude(amount=-F5_T77_DEPTH)

    split(bisect_by=Plane.YZ, keep=Keep.TOP)


with BuildPart() as f5_tool71_1:
    add(f5_tool71.part)

    # F5_t79: intersect F5_tool75
    add(f5_tool75.part, mode=Mode.INTERSECT)


with BuildPart() as f1_9:
    add(f1_8.part)

    # F5_t69: cut F5_tool71
    add(f5_tool71_1.part, mode=Mode.SUBTRACT)


with BuildPart() as f5_tool82:
    # F5_s83 → F5_t84 (new body)
    with BuildSketch(Plane.YZ.offset(-71.12)):
        with BuildLine():
            ThreePointArc((0, 5.08), (1.4878975516, 1.4878975516), (5.08, 0))
            Line((5.08, 0), (0, 0))
            Line((0, 0), (0, 5.08))
        make_face()
    extrude(amount=F5_T84_DEPTH)

    split(bisect_by=Plane.YZ, keep=Keep.TOP)


with BuildPart() as f5_tool86:
    # F5_s87 → F5_t88 (new body)
    with BuildSketch(Plane.XY.offset(12.7)):
        with BuildLine():
            ThreePointArc((5.08, 0), (1.4878975516, 1.4878975516), (0, 5.08))
            Line((0, 5.08), (0, 0))
            Line((0, 0), (5.08, 0))
        make_face()
    extrude(amount=-F5_T88_DEPTH)

    split(bisect_by=Plane.XY, keep=Keep.TOP)


with BuildPart() as f5_tool82_1:
    add(f5_tool82.part)

    # F5_t90: intersect F5_tool86
    add(f5_tool86.part, mode=Mode.INTERSECT)


with BuildPart() as f1_10:
    add(f1_9.part)

    # F5_t80: cut F5_tool82
    add(f5_tool82_1.part, mode=Mode.SUBTRACT)


with BuildPart() as f5_tool93:
    # F5_s94 → F5_t95 (new body)
    with BuildSketch(Plane.XY):
        with BuildLine():
            ThreePointArc((5.08, 0), (1.4878975516, 1.4878975516), (0, 5.08))
            Line((0, 5.08), (0, 0))
            Line((0, 0), (5.08, 0))
        make_face()
    extrude(amount=-F5_T95_DEPTH)

    split(bisect_by=Plane.XY.offset(-17.9551715762), keep=Keep.BOTTOM)


with BuildPart() as f5_tool97:
    # F5_s98 → F5_t99 (new body)
    with BuildSketch(Plane.YZ.offset(12.7)):
        with BuildLine():
            ThreePointArc((0, -23.0351715762), (1.4878975516, -19.4430691278), (5.08, -17.9551715762))
            Line((5.08, -17.9551715762), (0, -17.9551715762))
            Line((0, -17.9551715762), (0, -23.0351715762))
        make_face()
    extrude(amount=-F5_T99_DEPTH)

    split(bisect_by=Plane.YZ, keep=Keep.TOP)


with BuildPart() as f5_tool93_1:
    add(f5_tool93.part)

    # F5_t101: intersect F5_tool97
    add(f5_tool97.part, mode=Mode.INTERSECT)


with BuildPart() as f1_11:
    add(f1_10.part)

    # F5_t91: cut F5_tool93
    add(f5_tool93_1.part, mode=Mode.SUBTRACT)


with BuildPart() as f5_tool104:
    # F5_s105 → F5_t106 (new body)
    with BuildSketch(Plane.XY.offset(58.2448284238)):
        with BuildLine():
            ThreePointArc((0, 45.72), (1.4878975516, 49.3121024484), (5.08, 50.8))
            Line((5.08, 50.8), (0, 50.8))
            Line((0, 50.8), (0, 45.72))
        make_face()
    extrude(amount=-F5_T106_DEPTH)

    split(bisect_by=Plane.XY.offset(25.4), keep=Keep.BOTTOM)


with BuildPart() as f5_tool108:
    # F5_s109 → F5_t110 (new body)
    with BuildSketch(Plane.YZ.offset(12.7)):
        with BuildLine():
            ThreePointArc((45.72, 25.4), (49.3121024484, 23.9121024484), (50.8, 20.32))
            Line((50.8, 20.32), (50.8, 25.4))
            Line((50.8, 25.4), (45.72, 25.4))
        make_face()
    extrude(amount=-F5_T110_DEPTH)

    split(bisect_by=Plane.YZ, keep=Keep.TOP)


with BuildPart() as f5_tool104_1:
    add(f5_tool104.part)

    # F5_t112: intersect F5_tool108
    add(f5_tool108.part, mode=Mode.INTERSECT)


with BuildPart() as f1_12:
    add(f1_11.part)

    # F5_t102: cut F5_tool104
    add(f5_tool104_1.part, mode=Mode.SUBTRACT)


with BuildPart() as f5_tool115:
    # F5_s116 → F5_t117 (new body)
    with BuildSketch(Plane.YZ.offset(-71.12)):
        with BuildLine():
            ThreePointArc((50.8, 5.08), (49.3121024484, 1.4878975516), (45.72, 0))
            Line((45.72, 0), (50.8, 0))
            Line((50.8, 0), (50.8, 5.08))
        make_face()
    extrude(amount=F5_T117_DEPTH)

    split(bisect_by=Plane.YZ, keep=Keep.TOP)


with BuildPart() as f5_tool119:
    # F5_s120 → F5_t121 (new body)
    with BuildSketch(Plane.XY.offset(12.7)):
        with BuildLine():
            ThreePointArc((5.08, 50.8), (1.4878975516, 49.3121024484), (0, 45.72))
            Line((0, 45.72), (0, 50.8))
            Line((0, 50.8), (5.08, 50.8))
        make_face()
    extrude(amount=-F5_T121_DEPTH)

    split(bisect_by=Plane.XY, keep=Keep.TOP)


with BuildPart() as f5_tool115_1:
    add(f5_tool115.part)

    # F5_t123: intersect F5_tool119
    add(f5_tool119.part, mode=Mode.INTERSECT)


with BuildPart() as f1_13:
    add(f1_12.part)

    # F5_t113: cut F5_tool115
    add(f5_tool115_1.part, mode=Mode.SUBTRACT)


with BuildPart() as f5_tool126:
    # F5_s127 → F5_t128 (new body)
    with BuildSketch(Plane.XY):
        with BuildLine():
            ThreePointArc((5.08, 50.8), (1.4878975516, 49.3121024484), (0, 45.72))
            Line((0, 45.72), (0, 50.8))
            Line((0, 50.8), (5.08, 50.8))
        make_face()
    extrude(amount=-F5_T128_DEPTH)

    split(bisect_by=Plane.XY.offset(-17.9551715762), keep=Keep.BOTTOM)


with BuildPart() as f5_tool130:
    # F5_s131 → F5_t132 (new body)
    with BuildSketch(Plane.YZ.offset(12.7)):
        with BuildLine():
            ThreePointArc((50.8, -23.0351715762), (49.3121024484, -19.4430691278), (45.72, -17.9551715762))
            Line((45.72, -17.9551715762), (50.8, -17.9551715762))
            Line((50.8, -17.9551715762), (50.8, -23.0351715762))
        make_face()
    extrude(amount=-F5_T132_DEPTH)

    split(bisect_by=Plane.YZ, keep=Keep.TOP)


with BuildPart() as f5_tool126_1:
    add(f5_tool126.part)

    # F5_t134: intersect F5_tool130
    add(f5_tool130.part, mode=Mode.INTERSECT)


with BuildPart() as f1_14:
    add(f1_13.part)

    # F5_t124: cut F5_tool126
    add(f5_tool126_1.part, mode=Mode.SUBTRACT)

    # F6 (on face) → F7 (cut)
    with BuildSketch(Plane.XY.offset(-17.9551715762)):
        with BuildLine():
            ThreePointArc((-138.6253818214, 17.7800003439), (-142.5330744401, 13.8723077253), (-138.6253818214, 9.9646151066))
            Line((-138.6253818214, 9.9646151066), (-87.8253818214, 9.9646151066))
            ThreePointArc((-87.8253818214, 9.9646151066), (-83.9176892027, 13.8723077253), (-87.8253818214, 17.7800003439))
            Line((-87.8253818214, 17.7800003439), (-138.6253818214, 17.7800003439))
        make_face()
        with BuildLine():
            ThreePointArc((-138.6253818214, 30.4800003439), (-142.4353818214, 26.6700003439), (-138.6253818214, 22.8600003439))
            Line((-138.6253818214, 22.8600003439), (-87.8253818214, 22.8600003439))
            ThreePointArc((-87.8253818214, 22.8600003439), (-84.0153818214, 26.6700003439), (-87.8253818214, 30.4800003439))
            Line((-87.8253818214, 30.4800003439), (-138.6253818214, 30.4800003439))
        make_face()
        with BuildLine():
            ThreePointArc((-138.6253818214, 42.3984639347), (-142.0446136168, 38.9792321393), (-138.6253818214, 35.5600003439))
            Line((-138.6253818214, 35.5600003439), (-87.8253818214, 35.5600003439))
            ThreePointArc((-87.8253818214, 35.5600003439), (-84.406150026, 38.9792321393), (-87.8253818214, 42.3984639347))
            Line((-87.8253818214, 42.3984639347), (-138.6253818214, 42.3984639347))
        make_face()
    extrude(amount=-F7_DEPTH, mode=Mode.SUBTRACT)


solid = f1_14.part
